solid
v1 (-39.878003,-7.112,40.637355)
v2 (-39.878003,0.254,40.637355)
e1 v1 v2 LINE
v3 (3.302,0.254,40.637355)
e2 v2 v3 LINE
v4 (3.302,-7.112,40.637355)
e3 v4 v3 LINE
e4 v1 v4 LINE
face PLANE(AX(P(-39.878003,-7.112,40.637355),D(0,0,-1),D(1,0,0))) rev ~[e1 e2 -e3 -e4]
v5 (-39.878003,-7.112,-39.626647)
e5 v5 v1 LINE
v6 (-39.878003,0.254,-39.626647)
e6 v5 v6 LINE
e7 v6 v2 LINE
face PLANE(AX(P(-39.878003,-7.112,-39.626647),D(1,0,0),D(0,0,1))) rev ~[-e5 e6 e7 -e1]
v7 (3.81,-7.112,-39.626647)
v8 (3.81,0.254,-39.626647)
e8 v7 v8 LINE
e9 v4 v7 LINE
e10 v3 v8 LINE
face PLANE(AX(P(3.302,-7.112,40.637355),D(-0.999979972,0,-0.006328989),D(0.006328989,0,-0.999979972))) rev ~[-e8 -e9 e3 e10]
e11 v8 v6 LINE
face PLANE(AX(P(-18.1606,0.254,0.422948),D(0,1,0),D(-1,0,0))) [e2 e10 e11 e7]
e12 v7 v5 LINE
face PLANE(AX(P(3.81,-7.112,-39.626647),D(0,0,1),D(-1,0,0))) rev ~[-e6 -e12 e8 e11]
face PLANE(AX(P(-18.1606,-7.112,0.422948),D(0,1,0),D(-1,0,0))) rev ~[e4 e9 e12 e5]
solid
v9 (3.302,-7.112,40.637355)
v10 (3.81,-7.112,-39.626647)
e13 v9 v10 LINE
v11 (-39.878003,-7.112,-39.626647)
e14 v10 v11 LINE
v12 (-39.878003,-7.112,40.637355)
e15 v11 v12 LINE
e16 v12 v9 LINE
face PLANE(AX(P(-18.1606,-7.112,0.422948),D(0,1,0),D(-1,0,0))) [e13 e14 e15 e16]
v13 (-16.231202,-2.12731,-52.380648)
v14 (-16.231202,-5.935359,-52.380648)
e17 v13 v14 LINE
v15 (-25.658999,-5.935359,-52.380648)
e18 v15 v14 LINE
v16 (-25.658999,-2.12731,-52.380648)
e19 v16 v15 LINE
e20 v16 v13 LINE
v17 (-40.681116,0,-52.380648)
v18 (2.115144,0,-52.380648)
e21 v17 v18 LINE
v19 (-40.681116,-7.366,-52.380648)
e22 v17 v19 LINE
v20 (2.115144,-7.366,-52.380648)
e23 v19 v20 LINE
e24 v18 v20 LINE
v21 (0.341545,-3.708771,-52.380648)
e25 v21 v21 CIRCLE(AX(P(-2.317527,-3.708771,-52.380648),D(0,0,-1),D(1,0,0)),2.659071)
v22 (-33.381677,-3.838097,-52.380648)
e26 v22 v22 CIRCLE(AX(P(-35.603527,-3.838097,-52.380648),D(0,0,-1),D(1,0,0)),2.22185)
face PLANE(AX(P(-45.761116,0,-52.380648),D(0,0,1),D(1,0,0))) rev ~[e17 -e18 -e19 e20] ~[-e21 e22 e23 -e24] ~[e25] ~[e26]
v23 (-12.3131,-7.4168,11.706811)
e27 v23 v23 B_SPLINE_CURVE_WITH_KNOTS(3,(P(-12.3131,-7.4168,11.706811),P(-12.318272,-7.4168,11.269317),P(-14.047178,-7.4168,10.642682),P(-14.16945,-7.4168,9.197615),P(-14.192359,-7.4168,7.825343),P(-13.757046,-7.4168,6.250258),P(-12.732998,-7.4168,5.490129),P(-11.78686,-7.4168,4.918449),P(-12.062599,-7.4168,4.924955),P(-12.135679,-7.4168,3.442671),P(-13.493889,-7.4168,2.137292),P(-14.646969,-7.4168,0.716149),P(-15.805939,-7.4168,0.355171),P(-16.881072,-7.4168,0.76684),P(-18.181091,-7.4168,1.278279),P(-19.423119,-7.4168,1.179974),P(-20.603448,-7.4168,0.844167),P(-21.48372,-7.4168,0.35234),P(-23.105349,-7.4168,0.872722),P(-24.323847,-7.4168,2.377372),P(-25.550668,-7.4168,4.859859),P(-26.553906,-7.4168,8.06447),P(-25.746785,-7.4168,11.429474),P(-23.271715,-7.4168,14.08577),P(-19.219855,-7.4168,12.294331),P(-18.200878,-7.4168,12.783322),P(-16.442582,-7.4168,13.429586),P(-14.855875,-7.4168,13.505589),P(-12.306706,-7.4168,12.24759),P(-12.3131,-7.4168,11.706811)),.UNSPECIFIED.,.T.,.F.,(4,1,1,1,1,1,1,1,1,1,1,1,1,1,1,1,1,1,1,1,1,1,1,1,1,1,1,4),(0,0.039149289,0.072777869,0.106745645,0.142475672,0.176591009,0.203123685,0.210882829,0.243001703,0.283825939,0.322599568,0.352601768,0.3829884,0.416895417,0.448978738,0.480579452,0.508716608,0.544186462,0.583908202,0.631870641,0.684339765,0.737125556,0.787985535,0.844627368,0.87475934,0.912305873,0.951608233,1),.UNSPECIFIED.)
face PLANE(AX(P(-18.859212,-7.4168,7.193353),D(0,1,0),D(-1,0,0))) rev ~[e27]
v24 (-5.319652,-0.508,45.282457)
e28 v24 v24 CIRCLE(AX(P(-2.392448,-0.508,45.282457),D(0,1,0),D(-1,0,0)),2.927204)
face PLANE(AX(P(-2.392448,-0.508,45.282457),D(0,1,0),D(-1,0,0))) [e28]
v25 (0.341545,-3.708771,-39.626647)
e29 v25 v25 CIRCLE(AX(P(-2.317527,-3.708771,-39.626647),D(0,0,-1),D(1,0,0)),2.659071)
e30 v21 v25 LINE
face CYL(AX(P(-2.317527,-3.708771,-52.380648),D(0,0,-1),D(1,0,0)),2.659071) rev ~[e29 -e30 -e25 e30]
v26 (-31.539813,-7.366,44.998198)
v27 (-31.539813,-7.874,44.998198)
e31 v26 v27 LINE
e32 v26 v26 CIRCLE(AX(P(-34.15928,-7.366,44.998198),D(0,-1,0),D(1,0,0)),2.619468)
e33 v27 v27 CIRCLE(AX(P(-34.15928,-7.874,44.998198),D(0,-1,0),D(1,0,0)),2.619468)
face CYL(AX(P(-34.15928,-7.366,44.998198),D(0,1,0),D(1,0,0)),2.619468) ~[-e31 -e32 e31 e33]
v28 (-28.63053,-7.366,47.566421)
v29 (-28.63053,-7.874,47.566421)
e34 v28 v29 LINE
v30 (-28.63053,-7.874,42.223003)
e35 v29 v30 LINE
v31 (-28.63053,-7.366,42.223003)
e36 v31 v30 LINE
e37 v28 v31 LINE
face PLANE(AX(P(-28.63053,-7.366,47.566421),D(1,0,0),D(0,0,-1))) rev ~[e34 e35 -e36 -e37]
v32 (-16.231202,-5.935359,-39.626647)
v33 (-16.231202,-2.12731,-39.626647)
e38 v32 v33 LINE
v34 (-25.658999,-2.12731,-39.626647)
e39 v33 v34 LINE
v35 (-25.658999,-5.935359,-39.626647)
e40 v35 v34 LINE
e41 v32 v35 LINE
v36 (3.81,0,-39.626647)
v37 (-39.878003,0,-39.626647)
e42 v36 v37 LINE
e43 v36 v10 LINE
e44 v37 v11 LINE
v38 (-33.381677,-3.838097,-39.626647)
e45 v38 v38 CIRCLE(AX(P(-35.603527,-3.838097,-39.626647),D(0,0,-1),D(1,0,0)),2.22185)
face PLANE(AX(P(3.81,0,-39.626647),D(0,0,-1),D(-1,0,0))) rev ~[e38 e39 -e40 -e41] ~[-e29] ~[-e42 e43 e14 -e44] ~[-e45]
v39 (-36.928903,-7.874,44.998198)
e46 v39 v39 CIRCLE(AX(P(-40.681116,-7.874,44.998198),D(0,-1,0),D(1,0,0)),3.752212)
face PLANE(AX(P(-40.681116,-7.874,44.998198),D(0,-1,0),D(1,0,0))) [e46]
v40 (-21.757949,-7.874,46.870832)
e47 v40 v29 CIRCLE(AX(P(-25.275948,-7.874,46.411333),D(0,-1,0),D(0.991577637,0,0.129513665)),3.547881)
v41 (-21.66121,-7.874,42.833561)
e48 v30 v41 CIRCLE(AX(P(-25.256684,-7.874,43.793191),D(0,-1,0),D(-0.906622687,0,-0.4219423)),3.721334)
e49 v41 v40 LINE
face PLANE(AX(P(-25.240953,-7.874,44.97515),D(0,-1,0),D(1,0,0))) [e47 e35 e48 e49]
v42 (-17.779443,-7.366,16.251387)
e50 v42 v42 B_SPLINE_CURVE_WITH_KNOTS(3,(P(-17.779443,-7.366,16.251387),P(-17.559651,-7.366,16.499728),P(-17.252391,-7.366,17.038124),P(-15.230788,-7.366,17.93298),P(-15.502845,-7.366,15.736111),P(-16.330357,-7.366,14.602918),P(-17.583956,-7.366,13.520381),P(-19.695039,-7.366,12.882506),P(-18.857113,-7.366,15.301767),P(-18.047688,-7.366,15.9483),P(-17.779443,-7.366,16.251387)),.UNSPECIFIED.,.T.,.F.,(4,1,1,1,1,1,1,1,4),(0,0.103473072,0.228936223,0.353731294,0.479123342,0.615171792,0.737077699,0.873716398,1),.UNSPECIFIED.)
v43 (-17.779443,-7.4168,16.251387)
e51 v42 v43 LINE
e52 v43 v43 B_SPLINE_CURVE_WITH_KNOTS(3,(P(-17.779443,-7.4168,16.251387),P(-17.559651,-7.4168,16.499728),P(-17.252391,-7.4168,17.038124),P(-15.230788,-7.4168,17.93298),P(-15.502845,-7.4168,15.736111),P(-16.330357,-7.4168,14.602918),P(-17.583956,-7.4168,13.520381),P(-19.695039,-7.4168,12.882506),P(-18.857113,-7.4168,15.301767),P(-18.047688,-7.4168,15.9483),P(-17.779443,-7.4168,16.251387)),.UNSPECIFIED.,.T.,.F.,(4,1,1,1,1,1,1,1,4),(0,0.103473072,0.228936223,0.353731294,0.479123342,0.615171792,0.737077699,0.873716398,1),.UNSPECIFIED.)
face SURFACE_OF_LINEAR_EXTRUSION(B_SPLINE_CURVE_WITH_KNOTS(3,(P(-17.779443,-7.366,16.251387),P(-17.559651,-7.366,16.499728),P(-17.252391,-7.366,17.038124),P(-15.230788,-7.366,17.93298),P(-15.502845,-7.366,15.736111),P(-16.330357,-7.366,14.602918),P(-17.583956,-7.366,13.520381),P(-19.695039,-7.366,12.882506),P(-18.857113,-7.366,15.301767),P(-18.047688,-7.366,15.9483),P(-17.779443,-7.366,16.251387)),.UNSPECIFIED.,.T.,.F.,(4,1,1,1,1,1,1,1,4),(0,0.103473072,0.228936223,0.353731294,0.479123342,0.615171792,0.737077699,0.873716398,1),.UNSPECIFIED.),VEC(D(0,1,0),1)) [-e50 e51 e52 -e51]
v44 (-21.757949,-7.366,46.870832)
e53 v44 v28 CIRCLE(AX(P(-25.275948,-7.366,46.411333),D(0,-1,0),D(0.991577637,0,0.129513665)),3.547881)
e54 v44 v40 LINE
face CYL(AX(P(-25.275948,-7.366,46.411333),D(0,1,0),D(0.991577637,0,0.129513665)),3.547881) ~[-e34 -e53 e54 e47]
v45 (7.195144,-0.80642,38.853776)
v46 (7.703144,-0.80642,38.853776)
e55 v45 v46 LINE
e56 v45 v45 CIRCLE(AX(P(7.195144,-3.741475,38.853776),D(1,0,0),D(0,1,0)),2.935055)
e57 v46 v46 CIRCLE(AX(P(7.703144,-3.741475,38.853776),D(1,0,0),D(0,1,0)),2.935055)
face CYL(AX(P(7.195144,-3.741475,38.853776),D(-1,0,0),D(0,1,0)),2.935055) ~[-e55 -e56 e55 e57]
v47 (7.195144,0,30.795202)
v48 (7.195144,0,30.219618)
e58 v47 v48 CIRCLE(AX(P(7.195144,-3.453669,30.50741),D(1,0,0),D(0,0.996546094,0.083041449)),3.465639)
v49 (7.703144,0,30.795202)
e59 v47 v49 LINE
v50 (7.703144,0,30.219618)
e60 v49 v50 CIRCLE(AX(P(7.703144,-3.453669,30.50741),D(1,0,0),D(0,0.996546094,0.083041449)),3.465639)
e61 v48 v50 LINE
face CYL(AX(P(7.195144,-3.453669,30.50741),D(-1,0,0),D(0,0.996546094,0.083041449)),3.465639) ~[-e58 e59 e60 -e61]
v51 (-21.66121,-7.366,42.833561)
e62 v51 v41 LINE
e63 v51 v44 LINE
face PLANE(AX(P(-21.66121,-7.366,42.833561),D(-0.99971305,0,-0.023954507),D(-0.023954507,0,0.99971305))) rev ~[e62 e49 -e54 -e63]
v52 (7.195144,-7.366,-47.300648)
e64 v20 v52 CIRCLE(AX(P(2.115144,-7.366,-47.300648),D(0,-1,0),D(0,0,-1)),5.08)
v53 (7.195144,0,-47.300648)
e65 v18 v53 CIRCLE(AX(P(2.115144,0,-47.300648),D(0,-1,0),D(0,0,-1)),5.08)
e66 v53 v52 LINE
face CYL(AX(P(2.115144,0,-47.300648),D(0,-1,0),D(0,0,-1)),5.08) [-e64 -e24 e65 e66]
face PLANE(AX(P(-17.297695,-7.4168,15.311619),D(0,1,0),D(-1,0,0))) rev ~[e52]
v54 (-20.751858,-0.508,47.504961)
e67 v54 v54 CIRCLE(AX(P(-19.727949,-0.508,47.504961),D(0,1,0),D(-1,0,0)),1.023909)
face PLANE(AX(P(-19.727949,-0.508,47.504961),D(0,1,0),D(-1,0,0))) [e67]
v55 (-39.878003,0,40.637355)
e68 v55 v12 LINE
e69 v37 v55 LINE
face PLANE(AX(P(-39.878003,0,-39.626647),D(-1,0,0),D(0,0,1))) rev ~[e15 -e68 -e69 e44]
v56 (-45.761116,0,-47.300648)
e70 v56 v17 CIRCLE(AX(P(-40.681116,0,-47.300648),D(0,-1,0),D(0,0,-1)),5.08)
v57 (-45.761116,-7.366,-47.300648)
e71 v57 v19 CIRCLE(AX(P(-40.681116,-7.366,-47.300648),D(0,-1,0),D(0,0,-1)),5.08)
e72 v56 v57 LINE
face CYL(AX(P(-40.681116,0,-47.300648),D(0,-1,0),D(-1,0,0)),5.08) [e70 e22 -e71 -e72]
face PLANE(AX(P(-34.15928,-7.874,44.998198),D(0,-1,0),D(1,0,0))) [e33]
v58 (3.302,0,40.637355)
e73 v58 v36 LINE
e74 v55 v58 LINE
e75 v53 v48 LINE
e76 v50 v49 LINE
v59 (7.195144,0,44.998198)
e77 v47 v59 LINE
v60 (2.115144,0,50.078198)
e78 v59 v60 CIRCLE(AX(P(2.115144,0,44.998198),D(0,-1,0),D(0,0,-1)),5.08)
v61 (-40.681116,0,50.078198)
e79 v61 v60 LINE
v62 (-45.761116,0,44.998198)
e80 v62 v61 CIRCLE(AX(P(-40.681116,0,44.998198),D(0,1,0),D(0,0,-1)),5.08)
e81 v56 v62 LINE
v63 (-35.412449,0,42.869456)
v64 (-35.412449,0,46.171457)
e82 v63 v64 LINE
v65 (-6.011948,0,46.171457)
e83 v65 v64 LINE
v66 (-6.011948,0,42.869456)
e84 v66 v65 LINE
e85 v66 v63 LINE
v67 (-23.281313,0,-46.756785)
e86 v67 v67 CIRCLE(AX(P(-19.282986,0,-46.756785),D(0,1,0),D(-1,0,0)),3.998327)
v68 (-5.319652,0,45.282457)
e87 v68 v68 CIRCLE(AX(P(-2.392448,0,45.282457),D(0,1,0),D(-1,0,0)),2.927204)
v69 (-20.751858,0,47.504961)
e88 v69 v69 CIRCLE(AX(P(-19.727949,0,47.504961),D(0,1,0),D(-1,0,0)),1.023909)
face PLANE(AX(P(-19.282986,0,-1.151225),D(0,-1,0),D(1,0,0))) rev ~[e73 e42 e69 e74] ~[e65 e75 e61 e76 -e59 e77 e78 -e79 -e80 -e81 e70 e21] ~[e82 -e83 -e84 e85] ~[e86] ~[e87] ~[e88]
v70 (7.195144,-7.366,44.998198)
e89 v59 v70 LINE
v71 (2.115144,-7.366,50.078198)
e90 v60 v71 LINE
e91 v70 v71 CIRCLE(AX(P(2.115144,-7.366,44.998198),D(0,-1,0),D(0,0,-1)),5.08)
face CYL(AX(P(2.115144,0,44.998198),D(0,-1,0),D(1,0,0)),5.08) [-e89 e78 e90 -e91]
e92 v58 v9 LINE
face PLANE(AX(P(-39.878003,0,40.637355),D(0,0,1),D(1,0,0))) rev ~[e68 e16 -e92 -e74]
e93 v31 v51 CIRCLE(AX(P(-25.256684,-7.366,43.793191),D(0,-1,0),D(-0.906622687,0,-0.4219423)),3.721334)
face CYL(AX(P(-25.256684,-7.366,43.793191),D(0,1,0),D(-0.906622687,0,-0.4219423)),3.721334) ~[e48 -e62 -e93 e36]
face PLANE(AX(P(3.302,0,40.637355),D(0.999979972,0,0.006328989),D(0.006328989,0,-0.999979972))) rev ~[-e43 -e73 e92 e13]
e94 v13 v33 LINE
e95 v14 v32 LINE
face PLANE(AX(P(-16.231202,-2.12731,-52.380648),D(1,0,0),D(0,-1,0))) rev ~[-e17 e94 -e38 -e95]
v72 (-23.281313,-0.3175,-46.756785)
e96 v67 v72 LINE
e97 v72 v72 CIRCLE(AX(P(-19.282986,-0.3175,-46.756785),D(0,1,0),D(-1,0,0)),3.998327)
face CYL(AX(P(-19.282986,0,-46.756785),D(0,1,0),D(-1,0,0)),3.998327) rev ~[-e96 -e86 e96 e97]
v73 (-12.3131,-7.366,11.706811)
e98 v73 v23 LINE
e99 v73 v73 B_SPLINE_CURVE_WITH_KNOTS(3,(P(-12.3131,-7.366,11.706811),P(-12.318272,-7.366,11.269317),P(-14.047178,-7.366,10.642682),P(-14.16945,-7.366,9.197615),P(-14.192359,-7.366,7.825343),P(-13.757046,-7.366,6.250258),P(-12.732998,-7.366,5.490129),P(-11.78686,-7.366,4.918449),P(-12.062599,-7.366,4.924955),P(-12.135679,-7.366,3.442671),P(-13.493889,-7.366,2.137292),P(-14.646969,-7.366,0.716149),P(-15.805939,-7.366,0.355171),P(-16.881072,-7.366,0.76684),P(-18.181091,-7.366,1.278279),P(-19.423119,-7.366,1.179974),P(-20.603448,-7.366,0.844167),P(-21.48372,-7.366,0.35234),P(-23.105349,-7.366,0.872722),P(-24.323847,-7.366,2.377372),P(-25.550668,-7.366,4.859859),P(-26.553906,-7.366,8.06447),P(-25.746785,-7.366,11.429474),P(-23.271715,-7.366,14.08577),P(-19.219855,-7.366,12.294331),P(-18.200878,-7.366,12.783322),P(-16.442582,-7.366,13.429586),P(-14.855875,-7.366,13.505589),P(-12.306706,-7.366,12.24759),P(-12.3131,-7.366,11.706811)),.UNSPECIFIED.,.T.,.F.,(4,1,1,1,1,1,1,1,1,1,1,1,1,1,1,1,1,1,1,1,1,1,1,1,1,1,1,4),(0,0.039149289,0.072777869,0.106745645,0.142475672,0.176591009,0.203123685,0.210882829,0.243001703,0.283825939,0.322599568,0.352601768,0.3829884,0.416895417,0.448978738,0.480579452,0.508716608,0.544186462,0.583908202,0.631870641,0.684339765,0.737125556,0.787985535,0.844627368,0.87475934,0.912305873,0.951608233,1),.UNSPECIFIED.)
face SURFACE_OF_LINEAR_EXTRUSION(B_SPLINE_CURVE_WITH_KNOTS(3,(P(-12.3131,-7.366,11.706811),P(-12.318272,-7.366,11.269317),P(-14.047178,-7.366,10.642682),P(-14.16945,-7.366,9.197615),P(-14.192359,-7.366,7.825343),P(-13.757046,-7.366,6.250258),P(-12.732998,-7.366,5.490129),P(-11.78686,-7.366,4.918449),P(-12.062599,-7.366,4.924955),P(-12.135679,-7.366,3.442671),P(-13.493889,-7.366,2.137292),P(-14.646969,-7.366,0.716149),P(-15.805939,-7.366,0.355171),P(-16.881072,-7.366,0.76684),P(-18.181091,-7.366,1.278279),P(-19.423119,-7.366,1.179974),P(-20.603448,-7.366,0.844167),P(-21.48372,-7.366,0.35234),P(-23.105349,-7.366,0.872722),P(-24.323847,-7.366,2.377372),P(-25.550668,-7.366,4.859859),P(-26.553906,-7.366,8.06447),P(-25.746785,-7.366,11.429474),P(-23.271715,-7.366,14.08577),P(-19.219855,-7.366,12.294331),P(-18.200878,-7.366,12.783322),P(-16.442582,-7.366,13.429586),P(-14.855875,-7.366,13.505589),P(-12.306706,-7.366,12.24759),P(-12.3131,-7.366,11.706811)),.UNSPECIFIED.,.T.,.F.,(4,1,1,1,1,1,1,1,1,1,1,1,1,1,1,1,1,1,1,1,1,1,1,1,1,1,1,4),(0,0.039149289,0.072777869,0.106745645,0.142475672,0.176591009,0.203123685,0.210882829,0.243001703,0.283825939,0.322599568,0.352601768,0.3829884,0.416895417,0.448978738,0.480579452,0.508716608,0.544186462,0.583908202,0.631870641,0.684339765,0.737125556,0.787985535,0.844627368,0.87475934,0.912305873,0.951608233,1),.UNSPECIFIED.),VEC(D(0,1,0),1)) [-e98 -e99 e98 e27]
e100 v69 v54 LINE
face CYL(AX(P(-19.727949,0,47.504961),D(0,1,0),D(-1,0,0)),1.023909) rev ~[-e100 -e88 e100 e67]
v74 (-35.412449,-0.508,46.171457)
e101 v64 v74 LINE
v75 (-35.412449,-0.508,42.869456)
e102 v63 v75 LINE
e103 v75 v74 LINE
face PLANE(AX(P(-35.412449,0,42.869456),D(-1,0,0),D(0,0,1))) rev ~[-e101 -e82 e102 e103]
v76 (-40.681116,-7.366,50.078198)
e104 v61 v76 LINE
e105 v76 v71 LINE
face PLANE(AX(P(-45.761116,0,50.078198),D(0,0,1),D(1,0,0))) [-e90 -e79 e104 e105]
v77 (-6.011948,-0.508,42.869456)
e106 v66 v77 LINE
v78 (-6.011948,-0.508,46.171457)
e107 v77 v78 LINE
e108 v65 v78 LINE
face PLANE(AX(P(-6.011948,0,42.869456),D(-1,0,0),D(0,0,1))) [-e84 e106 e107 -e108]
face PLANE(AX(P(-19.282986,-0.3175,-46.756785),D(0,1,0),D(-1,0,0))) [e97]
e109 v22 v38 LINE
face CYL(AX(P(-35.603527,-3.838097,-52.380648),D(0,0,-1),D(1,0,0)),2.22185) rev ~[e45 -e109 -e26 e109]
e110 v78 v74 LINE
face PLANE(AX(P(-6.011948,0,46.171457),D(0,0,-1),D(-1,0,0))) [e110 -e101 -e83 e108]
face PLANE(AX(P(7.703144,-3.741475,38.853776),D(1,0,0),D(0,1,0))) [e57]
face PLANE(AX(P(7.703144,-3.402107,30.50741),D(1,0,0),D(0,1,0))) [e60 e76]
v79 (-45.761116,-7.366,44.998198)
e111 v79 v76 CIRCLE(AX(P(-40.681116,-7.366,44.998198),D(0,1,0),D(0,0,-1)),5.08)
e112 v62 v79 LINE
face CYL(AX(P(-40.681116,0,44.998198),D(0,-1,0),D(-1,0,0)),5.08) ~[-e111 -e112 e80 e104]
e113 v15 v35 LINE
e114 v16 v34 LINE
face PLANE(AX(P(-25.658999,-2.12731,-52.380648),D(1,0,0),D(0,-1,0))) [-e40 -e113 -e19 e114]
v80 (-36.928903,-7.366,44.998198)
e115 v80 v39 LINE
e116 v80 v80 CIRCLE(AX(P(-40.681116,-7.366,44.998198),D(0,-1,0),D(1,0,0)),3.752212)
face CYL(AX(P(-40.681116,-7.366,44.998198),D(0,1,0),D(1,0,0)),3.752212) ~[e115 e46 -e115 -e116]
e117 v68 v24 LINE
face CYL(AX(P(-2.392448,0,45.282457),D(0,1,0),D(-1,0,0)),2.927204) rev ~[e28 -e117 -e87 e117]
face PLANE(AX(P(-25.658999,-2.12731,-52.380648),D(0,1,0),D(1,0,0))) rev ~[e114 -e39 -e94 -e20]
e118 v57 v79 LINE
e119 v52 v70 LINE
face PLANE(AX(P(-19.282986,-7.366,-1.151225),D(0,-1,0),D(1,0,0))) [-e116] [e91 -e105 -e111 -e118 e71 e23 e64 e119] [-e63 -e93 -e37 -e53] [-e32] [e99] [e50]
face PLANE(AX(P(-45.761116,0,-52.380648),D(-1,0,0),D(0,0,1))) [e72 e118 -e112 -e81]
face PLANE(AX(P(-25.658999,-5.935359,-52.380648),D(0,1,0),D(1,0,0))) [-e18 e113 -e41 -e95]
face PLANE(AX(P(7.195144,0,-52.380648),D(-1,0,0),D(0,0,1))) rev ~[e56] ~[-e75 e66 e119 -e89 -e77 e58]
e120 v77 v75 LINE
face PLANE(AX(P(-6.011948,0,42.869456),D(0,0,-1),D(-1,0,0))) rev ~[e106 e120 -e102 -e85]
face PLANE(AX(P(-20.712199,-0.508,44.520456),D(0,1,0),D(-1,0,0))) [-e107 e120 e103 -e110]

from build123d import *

# Parameters (mm, degrees)
F0_W      = 52.9562598094
F0_H      = 102.458845824
F1_DEPTH  = 7.366
F2_R      = 5.08
F4_R      = 2.6590711811
F4_W      = 9.4277970493
F4_H      = 3.8080494851
F4_R_2    = 2.2218501958
F5_DEPTH  = 25.4
F3_R      = 3.9983268575
F6_DEPTH  = 0.3175
F8_DEPTH  = 7.112
F9_R      = 3.7522124086
F10_DEPTH = 0.508
F9_R_2    = 2.6194678396
F11_DEPTH = 0.508
F13_DEPTH = 7.366
F14_R     = 2.927204105
F14_W     = 29.4005014002
F14_H     = 3.302000463
F14_R_2   = 1.0239087259
F15_DEPTH = 0.508
F18_DEPTH = 0.0508
F19_R     = 2.9350553776
F20_DEPTH = 0.508


# Not quite as in the source:
# - a feature of the source that left no trace in its solid (it failed there, or was rolled back) is left out


with BuildPart() as f1:
    # F0 (on Front) → F1 (new body)
    with BuildSketch(Plane.XZ):
        with Locations((-19.2829859443, -1.1512245983)):
            Rectangle(F0_W, F0_H)
    extrude(amount=F1_DEPTH)

    # F2
    f2_edges = [f1.edges().sort_by_distance(p)[0] for p in [
        (-45.761116, -3.683, 50.078198),
        (7.195144, -3.683, 50.078198),
        (7.195144, -3.683, -52.380648),
        (-45.761116, -3.683, -52.380648),
    ]]
    fillet(f2_edges, radius=F2_R)

    # F4 (on face) → F5 (cut)
    with BuildSketch(Plane(origin=(0, 0, -52.3806475103), x_dir=(1, 0, 0), z_dir=(0, 0, -1))):
        with Locations((-2.3175266106, 3.70877143)):
            Circle(F4_R)
        with Locations((-20.9451001137, 4.031334538)):
            Rectangle(F4_W, F4_H)
        with Locations((-35.6035269797, 3.8380967453)):
            Circle(F4_R_2)
    extrude(amount=-F5_DEPTH, mode=Mode.SUBTRACT)

    # F3 (on face) → F6 (cut)
    with BuildSketch(Plane(origin=(0, 0, 0), x_dir=(-1, 0, 0), z_dir=(0, 1, 0))):
        with Locations((19.2829859443, -46.756785363)):
            Circle(F3_R)
    extrude(amount=-F6_DEPTH, mode=Mode.SUBTRACT)

    # F7 (on face) → F8 (cut)
    with BuildSketch(Plane(origin=(0, 0, 0), x_dir=(-1, 0, 0), z_dir=(0, 1, 0))):
        Polygon((39.8780032992, 40.6373552978), (-3.3019997645, 40.6373552978), (-3.8099999074, -39.6266467869), (39.8780032992, -39.6266467869), align=None)
    extrude(amount=-F8_DEPTH, mode=Mode.SUBTRACT)

    # F9 (on face) → F10 (join)
    with BuildSketch(Plane.XZ.offset(7.366)):
        with Locations((-40.681115849, 44.9981983137)):
            Circle(F9_R)
    extrude(amount=F10_DEPTH)

    # F9 (on face) → F11 (join)
    with BuildSketch(Plane.XZ.offset(7.366)):
        with Locations((-40.681115849, 44.9981983137)):
            Circle(F9_R)
        with BuildLine():
            Line((-21.6612099299, 42.8335605604), (-21.757948526, 46.8708315703))
            ThreePointArc((-21.757948526, 46.8708315703), (-24.9186836694, 49.9411794414), (-28.6305304617, 47.56642133))
            Line((-28.6305304617, 47.56642133), (-28.6305304617, 42.2230027616))
            ThreePointArc((-28.6305304617, 42.2230027616), (-24.9319153156, 40.0860556465), (-21.6612099299, 42.8335605604))
        make_face()
        with Locations((-34.1592803597, 44.9981983137)):
            Circle(F9_R_2)
    extrude(amount=F11_DEPTH)

    # F14 (on face) → F15 (cut)
    with BuildSketch(Plane(origin=(0, 0, 0), x_dir=(-1, 0, 0), z_dir=(0, 1, 0))):
        with Locations((2.3924480192, 45.2824570239)):
            Circle(F14_R)
        with Locations((20.7121986896, 44.5204563439)):
            Rectangle(F14_W, F14_H)
        with Locations((19.727949053, 47.5049614906)):
            Circle(F14_R_2)
    extrude(amount=-F15_DEPTH, mode=Mode.SUBTRACT)

    # F17 (on face) → F18 (join)
    with BuildSketch(Plane.XZ.offset(7.366)):
        with BuildLine():
            add(Edge.make_bspline(
                [(-12.313099578, 11.7068113759), (-12.3182719745, 11.2693172346), (-14.0471777892, 10.6426821522), (-14.1694497269, 9.1976154433), (-14.1923588981, 7.8253429333), (-13.757045673, 6.2502584285), (-12.732998031, 5.4901288014), (-11.7868601393, 4.9184492153), (-12.0625993678, 4.9249552084), (-12.1356791253, 3.442670809), (-13.4938891698, 2.1372915784), (-14.6469691571, 0.7161487492), (-15.8059393346, 0.355170558), (-16.8810715776, 0.7668398235), (-18.1810906095, 1.2782789872), (-19.4231192534, 1.1799743607), (-20.6034478055, 0.8441669396), (-21.4837195128, 0.3523397632), (-23.1053492827, 0.8727222184), (-24.3238470967, 2.3773718388), (-25.5506684803, 4.8598592274), (-26.5539056297, 8.0644702423), (-25.7467847595, 11.4294737742), (-23.2717151551, 14.0857698999), (-19.2198549823, 12.2943314765), (-18.2008775604, 12.7833222733), (-16.4425818501, 13.4295862797), (-14.8558748752, 13.5055890759), (-12.3067060672, 12.2475904084), (-12.313099578, 11.7068113759)],
                knots=[0, 0, 0, 0, 0.0391492889, 0.0727778694, 0.1067456455, 0.1424756723, 0.1765910088, 0.203123685, 0.2108828285, 0.2430017031, 0.2838259394, 0.3225995677, 0.3526017684, 0.3829884004, 0.4168954172, 0.4489787383, 0.4805794524, 0.5087166076, 0.5441864617, 0.5839082017, 0.6318706413, 0.6843397655, 0.737125556, 0.7879855348, 0.8446273684, 0.8747593402, 0.9123058727, 0.951608233, 1, 1, 1, 1], degree=3))
        make_face()
        with BuildLine():
            add(Edge.make_bspline(
                [(-17.779443413, 16.2513870746), (-17.5596513889, 16.4997277835), (-17.2523909762, 17.0381238074), (-15.2307876048, 17.9329802627), (-15.5028451921, 15.7361114376), (-16.3303567014, 14.6029182381), (-17.5839563283, 13.5203805258), (-19.6950391667, 12.8825060067), (-18.857112639, 15.3017670358), (-18.0476883571, 15.9482999183), (-17.779443413, 16.2513870746)],
                knots=[0, 0, 0, 0, 0.1034730724, 0.2289362231, 0.3537312944, 0.4791233423, 0.6151717915, 0.7370776987, 0.8737163979, 1, 1, 1, 1], degree=3))
        make_face()
    extrude(amount=F18_DEPTH)

    # F19 (on face) → F20 (join)
    with BuildSketch(Plane.YZ.offset(7.1951439604)):
        with Locations((-3.741475055, 38.8537757099)):
            Circle(F19_R)
        with BuildLine():
            Line((0, 30.2196182314), (0, 30.7952016589))
            ThreePointArc((0, 30.7952016589), (-6.9193087342, 30.5074099451), (0, 30.2196182314))
        make_face()
    extrude(amount=F20_DEPTH)


with BuildPart() as f13:
    # F12 (on face) → F13 (new body)
    with BuildSketch(Plane(origin=(0, -7.112, 0), x_dir=(-1, 0, 0), z_dir=(0, 1, 0))):
        Polygon((39.8780032992, -39.6266467869), (39.8780032992, 40.6373552978), (-3.3019997645, 40.6373552978), (-3.8099999074, -39.6266467869), align=None)
    extrude(amount=F13_DEPTH)


solid = Compound([f1.part, f13.part])
